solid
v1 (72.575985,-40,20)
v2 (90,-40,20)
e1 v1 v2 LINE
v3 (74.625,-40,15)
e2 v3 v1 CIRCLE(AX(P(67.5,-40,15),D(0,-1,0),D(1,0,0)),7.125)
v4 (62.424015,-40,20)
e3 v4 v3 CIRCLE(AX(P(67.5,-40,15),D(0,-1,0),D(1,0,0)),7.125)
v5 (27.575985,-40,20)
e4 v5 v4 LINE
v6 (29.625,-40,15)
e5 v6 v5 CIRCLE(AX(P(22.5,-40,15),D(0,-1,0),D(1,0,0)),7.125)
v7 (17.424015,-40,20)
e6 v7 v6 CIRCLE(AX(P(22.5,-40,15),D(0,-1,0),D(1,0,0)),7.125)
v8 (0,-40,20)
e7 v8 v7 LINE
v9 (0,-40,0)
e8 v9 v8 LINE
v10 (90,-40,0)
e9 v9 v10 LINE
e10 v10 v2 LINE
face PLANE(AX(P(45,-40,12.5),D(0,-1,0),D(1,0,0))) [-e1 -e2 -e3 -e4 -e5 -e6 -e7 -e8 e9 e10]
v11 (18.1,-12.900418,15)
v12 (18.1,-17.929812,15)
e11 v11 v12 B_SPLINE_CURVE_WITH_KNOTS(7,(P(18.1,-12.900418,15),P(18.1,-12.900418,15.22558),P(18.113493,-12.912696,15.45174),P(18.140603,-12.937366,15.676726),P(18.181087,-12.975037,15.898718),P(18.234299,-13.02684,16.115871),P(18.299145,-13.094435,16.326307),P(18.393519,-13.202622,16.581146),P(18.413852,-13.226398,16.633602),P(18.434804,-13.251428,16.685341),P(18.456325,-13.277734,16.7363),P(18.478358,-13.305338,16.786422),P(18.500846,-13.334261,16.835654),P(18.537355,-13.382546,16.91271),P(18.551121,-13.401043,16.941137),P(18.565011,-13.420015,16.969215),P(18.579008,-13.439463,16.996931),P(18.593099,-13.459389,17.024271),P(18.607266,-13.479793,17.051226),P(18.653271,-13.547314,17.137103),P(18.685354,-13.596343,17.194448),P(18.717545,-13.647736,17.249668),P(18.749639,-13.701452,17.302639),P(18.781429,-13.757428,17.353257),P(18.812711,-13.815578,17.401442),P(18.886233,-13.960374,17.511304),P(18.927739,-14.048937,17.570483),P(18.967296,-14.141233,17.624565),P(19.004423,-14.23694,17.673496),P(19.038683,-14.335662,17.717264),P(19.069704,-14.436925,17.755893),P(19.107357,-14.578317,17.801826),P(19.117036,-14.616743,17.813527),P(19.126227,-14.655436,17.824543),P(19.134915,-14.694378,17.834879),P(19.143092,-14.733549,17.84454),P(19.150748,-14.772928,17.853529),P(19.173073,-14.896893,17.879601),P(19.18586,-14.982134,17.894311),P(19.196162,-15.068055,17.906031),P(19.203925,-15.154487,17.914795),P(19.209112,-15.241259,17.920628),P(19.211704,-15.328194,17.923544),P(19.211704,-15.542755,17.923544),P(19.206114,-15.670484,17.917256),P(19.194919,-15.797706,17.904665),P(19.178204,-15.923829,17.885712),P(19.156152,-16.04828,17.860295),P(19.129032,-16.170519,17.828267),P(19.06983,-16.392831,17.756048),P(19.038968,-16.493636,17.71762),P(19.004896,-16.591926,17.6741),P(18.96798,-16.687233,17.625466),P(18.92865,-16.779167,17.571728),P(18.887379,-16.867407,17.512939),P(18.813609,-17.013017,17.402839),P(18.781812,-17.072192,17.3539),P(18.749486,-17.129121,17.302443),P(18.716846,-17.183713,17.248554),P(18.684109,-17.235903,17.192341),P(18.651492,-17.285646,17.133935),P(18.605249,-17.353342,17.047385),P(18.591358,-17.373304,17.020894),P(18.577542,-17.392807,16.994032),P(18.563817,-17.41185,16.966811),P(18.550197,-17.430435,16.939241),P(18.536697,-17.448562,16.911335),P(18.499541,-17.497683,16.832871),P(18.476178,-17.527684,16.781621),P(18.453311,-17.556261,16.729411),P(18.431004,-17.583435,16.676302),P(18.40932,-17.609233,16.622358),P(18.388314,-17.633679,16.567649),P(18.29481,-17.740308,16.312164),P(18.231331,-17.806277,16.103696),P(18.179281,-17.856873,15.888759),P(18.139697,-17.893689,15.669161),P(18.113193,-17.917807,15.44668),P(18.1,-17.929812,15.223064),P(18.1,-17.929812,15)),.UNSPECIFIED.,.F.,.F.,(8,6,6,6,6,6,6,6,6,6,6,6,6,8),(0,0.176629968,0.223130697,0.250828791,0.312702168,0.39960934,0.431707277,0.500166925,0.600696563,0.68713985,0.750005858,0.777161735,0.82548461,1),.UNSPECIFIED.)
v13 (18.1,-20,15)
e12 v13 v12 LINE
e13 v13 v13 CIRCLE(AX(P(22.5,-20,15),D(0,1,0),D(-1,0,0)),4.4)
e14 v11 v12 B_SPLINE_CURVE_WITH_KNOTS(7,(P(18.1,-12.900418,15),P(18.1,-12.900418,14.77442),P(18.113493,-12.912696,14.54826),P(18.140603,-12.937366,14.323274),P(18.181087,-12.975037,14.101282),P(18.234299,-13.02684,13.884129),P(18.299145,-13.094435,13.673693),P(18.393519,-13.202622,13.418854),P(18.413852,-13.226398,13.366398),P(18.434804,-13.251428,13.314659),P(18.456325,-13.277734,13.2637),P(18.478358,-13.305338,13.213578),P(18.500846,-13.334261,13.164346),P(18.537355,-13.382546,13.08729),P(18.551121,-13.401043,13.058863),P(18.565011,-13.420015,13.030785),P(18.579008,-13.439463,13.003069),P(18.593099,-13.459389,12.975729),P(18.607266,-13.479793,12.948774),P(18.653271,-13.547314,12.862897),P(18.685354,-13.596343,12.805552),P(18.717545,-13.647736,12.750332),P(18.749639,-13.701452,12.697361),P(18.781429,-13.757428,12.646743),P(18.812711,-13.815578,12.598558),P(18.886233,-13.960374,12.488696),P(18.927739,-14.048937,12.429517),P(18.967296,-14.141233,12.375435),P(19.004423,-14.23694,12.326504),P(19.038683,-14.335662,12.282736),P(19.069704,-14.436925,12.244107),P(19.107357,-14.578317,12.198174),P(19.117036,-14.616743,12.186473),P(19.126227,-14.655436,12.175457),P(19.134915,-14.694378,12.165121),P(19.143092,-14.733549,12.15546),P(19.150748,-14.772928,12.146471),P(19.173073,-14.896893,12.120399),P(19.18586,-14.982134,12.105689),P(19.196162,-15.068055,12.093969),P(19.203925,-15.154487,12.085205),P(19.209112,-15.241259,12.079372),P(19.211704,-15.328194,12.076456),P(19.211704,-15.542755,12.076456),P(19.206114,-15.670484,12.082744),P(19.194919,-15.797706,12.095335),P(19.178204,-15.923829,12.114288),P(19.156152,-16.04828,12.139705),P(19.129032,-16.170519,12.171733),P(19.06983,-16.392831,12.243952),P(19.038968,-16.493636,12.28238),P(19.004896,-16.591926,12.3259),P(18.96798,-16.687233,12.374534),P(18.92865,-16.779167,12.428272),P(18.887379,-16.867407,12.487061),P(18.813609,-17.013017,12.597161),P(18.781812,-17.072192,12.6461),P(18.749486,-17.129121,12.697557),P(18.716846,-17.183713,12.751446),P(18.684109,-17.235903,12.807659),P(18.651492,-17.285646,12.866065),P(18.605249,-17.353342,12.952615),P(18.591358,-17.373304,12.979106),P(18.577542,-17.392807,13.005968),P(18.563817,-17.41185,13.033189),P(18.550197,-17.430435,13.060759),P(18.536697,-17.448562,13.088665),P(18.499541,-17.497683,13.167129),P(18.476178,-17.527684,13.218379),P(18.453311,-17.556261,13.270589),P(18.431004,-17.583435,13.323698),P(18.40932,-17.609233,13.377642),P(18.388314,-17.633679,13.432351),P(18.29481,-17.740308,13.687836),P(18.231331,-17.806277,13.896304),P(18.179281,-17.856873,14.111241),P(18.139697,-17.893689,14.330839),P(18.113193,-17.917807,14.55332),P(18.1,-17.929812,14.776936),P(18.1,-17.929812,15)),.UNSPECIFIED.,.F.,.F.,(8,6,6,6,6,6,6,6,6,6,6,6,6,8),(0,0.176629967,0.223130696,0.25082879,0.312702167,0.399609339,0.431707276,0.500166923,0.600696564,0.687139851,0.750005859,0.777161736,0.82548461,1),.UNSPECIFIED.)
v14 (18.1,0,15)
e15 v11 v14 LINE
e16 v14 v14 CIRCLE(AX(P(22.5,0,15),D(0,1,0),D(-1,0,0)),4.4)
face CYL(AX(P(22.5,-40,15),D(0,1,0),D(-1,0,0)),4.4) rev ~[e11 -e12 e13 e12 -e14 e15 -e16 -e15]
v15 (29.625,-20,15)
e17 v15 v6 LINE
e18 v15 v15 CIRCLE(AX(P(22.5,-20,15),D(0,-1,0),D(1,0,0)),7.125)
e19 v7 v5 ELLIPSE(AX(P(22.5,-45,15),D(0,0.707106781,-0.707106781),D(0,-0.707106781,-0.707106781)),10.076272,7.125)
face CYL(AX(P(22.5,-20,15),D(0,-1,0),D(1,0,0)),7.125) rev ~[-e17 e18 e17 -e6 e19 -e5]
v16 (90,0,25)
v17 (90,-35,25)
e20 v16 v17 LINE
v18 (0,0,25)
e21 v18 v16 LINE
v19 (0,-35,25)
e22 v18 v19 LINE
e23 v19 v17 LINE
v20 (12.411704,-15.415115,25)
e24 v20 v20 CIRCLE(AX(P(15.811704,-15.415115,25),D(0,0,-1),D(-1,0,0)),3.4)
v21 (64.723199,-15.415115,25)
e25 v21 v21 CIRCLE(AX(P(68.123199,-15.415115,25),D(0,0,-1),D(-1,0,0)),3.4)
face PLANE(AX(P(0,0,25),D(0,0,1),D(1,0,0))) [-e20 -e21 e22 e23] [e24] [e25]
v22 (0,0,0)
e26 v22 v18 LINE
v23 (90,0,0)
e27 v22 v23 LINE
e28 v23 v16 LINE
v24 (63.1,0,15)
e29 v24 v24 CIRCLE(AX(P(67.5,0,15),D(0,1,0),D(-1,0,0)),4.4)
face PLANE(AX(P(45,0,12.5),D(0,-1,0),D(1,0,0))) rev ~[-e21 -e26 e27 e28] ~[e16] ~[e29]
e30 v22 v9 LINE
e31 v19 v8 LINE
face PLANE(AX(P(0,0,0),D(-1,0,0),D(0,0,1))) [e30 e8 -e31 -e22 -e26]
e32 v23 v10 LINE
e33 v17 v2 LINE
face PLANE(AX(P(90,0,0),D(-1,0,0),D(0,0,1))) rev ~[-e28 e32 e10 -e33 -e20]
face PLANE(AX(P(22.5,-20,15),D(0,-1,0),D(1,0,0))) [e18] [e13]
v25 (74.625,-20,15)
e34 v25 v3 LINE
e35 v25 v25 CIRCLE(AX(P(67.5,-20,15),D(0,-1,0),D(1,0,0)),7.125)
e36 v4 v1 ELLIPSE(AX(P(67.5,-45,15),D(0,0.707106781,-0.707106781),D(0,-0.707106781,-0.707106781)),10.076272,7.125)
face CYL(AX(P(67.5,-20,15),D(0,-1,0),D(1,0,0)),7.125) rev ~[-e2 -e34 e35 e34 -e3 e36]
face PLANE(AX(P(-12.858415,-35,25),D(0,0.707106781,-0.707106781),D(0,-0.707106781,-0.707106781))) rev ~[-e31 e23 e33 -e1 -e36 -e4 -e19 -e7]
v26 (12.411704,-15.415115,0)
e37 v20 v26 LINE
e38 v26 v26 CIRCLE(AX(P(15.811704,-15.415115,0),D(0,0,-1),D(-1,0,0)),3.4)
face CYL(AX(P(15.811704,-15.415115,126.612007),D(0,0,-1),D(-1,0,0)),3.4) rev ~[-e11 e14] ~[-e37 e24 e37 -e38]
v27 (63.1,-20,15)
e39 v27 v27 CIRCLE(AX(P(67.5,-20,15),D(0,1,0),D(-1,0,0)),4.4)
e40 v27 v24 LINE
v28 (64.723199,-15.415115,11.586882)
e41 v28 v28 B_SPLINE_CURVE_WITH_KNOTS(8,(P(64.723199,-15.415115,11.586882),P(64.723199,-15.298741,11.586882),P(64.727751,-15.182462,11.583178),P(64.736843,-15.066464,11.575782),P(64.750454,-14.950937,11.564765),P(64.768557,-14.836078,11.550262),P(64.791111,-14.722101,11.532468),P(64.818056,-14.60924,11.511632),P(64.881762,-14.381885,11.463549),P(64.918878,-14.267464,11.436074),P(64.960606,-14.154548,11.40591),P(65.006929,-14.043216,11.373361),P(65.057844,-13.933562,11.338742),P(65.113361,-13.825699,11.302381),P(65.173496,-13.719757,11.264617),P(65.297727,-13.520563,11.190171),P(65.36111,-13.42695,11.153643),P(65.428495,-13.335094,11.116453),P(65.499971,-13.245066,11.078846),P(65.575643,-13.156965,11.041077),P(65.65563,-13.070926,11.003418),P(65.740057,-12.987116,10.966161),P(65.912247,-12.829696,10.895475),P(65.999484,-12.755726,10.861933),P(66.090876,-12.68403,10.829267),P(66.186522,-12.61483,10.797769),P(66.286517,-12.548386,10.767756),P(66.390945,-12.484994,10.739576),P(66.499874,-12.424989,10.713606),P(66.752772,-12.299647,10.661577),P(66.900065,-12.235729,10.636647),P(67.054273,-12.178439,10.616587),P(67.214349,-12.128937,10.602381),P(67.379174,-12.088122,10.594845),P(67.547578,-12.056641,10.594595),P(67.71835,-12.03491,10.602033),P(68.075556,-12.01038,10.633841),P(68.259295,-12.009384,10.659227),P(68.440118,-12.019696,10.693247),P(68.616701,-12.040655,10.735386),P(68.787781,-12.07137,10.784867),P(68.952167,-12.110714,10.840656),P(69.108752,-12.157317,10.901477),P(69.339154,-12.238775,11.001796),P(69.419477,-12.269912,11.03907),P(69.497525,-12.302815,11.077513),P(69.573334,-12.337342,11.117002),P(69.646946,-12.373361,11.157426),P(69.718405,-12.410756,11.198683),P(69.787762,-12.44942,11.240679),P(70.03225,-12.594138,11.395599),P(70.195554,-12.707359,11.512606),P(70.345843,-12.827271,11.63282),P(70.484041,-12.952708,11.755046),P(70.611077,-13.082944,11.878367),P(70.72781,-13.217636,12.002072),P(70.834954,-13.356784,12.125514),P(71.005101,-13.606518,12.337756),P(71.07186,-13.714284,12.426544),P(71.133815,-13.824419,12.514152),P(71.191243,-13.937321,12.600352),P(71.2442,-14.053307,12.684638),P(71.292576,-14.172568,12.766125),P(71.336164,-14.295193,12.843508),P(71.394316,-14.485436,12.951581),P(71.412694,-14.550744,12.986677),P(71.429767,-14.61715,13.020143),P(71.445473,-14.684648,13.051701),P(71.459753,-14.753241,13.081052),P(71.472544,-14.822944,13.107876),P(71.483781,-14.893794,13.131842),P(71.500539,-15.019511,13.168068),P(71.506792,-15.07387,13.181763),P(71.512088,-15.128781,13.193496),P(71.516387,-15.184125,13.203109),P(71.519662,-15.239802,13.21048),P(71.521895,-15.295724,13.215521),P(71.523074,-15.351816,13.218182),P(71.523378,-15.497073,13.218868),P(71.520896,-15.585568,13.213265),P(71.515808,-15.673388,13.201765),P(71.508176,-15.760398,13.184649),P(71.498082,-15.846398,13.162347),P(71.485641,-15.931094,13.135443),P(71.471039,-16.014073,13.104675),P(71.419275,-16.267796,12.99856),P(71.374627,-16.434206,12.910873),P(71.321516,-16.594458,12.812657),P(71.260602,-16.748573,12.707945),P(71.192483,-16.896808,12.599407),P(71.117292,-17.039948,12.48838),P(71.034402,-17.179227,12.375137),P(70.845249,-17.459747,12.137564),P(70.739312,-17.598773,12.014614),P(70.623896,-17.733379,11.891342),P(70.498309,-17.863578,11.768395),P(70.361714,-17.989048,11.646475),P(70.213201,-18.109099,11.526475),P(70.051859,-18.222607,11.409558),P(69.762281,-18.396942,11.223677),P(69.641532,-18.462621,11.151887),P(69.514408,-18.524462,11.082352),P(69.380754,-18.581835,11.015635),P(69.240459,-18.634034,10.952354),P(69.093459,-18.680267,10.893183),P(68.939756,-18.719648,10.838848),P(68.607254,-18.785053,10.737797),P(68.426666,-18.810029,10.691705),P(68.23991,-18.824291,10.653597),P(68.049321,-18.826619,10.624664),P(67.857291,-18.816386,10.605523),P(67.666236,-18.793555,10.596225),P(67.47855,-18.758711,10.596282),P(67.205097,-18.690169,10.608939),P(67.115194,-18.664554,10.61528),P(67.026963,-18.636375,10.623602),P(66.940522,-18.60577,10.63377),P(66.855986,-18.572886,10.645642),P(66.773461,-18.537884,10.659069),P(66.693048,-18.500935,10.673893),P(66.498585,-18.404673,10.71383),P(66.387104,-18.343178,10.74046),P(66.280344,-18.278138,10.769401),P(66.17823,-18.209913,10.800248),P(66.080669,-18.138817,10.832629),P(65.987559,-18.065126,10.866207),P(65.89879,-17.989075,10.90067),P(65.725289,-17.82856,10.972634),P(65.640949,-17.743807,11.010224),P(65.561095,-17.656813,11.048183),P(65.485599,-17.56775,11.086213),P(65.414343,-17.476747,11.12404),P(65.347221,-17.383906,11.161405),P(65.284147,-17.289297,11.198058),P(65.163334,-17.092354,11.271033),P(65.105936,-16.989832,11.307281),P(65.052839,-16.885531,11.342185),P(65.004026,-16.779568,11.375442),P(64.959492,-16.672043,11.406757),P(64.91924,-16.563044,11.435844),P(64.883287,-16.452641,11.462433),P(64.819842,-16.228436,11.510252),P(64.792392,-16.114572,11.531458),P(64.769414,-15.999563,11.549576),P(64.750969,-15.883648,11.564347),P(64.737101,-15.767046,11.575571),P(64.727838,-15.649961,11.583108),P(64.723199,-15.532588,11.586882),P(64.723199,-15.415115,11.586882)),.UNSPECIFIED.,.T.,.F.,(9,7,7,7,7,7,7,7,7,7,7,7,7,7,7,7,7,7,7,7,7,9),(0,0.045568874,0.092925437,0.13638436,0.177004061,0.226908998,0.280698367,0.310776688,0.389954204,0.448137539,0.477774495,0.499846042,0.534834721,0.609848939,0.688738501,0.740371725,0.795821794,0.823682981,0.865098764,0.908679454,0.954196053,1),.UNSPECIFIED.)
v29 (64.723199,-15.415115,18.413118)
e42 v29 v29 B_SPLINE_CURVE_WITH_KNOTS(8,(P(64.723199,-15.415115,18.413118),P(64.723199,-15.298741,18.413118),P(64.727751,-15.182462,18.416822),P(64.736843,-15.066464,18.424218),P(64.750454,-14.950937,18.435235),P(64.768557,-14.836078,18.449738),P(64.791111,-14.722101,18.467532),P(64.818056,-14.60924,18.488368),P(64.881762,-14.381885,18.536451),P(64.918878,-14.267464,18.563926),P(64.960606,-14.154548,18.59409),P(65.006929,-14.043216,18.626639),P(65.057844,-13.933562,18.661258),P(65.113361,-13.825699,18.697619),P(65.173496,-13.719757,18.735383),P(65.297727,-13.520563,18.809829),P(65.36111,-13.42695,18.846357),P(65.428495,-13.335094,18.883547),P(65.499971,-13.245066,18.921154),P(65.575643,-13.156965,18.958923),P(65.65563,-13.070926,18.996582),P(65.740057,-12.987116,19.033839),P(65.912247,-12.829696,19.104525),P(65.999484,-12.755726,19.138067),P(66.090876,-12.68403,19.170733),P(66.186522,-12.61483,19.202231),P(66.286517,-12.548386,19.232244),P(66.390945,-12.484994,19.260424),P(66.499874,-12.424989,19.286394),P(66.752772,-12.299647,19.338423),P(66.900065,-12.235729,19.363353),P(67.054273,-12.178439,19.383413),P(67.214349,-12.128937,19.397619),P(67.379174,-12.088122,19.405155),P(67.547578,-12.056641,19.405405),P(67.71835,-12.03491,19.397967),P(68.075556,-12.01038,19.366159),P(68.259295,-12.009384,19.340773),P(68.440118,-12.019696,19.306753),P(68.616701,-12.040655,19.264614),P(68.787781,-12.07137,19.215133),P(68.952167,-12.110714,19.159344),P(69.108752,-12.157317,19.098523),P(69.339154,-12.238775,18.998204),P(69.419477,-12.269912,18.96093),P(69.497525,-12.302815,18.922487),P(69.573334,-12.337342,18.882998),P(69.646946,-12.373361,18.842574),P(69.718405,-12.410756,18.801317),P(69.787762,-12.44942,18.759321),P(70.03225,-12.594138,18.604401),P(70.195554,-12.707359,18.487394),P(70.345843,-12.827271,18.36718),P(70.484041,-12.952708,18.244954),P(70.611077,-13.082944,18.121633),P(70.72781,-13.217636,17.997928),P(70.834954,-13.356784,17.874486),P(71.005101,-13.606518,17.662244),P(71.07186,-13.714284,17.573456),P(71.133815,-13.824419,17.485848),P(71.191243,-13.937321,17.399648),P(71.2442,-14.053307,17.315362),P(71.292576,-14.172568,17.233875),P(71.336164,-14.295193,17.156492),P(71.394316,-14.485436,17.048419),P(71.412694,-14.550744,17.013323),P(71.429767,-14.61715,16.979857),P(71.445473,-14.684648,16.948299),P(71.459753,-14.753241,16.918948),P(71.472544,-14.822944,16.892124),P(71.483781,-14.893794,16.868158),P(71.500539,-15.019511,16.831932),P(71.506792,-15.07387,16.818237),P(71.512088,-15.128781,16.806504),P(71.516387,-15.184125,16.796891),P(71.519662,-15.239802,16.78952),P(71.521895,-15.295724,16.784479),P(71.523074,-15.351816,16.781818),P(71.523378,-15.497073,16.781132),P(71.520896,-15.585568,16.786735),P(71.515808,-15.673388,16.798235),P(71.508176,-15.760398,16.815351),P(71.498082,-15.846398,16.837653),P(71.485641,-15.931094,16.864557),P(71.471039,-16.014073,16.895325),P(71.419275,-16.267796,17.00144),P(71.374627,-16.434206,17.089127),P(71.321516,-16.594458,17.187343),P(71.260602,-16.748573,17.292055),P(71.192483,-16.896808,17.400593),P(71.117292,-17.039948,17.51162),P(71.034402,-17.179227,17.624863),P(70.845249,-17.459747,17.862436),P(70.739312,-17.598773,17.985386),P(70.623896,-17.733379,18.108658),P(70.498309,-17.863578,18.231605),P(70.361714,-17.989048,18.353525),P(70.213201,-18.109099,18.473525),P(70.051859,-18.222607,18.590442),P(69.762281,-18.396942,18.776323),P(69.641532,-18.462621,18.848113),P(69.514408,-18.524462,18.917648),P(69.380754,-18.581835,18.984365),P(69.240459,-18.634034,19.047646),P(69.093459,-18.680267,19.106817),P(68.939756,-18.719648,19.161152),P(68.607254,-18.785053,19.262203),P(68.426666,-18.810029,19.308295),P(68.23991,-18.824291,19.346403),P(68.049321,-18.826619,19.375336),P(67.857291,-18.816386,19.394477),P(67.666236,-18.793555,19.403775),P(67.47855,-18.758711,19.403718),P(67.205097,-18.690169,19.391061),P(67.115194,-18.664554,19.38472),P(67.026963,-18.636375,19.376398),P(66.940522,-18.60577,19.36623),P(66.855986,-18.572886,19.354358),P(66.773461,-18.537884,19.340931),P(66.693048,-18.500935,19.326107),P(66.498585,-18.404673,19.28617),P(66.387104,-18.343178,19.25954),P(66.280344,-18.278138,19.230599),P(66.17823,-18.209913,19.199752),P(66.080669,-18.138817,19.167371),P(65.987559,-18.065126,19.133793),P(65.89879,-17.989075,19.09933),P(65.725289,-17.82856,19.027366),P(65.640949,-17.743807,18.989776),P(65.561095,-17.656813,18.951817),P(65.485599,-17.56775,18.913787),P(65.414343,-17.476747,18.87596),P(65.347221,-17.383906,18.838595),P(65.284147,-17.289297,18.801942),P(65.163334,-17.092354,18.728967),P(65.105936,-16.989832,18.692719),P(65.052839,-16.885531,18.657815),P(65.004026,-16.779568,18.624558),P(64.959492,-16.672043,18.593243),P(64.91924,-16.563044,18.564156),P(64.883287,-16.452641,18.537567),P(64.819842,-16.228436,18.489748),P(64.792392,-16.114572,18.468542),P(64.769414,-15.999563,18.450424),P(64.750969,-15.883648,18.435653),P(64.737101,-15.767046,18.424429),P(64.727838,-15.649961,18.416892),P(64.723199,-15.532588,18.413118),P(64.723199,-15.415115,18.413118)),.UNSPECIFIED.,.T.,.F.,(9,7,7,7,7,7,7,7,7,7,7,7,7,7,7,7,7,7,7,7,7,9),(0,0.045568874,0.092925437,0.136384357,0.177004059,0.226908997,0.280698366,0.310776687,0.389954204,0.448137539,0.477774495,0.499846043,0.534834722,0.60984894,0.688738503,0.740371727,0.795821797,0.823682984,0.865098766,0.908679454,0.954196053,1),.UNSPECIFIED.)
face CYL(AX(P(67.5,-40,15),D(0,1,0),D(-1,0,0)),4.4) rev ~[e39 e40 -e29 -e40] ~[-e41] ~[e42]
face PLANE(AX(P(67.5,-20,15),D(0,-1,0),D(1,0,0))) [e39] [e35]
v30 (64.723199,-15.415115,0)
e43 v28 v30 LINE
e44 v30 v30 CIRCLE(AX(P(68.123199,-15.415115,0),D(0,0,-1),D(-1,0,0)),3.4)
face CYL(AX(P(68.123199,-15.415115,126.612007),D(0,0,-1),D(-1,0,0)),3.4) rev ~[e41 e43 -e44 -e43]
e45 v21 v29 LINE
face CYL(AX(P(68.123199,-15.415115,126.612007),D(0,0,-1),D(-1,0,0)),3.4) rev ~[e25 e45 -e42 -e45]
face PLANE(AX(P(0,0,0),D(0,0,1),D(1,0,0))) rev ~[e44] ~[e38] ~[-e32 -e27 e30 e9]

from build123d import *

# Parameters (mm, degrees)
F0_W           = 90
F0_H           = 25
F1_DEPTH       = 40
F3_D           = 8.8
F3_CBORE_D     = 14.25
F3_CBORE_DEPTH = 20
F4_T1_DEPTH    = 115.7168298797
F6_D           = 6.8


# Not quite as in the source:
# - a fillet or chamfer that OpenCascade refuses, or shapes differently, is made with other operations: its cross-section is extruded or revolved along the edge and cut away or added


with BuildPart() as f1:
    # F0 (on Front) → F1 (new body)
    with BuildSketch(Plane.XZ):
        with Locations((45, 12.5)):
            Rectangle(F0_W, F0_H)
    extrude(amount=F1_DEPTH)

    # F3 (through all)
    with Locations(Plane.XZ.offset(40)):
        with Locations((22.5, 15), (67.5, 15)):
            CounterBoreHole(F3_D / 2, F3_CBORE_D / 2, F3_CBORE_DEPTH)

    # F4: chamfer of 5 on 1 edges, made by hand

    # F4_s2 → F4_t1 (cut)
    with BuildSketch(Plane.YZ.offset(-12.8584149398)):
        Polygon((-35, 25), (-40, 20), (-40, 25), align=None)
    extrude(amount=F4_T1_DEPTH, mode=Mode.SUBTRACT)

    # F6 (through all)
    with Locations(Plane.XY.offset(25)):
        with Locations((15.8117040992, -15.4151152819), (68.1231990457, -15.4151152819)):
            Hole(F6_D / 2)


solid = f1.part
